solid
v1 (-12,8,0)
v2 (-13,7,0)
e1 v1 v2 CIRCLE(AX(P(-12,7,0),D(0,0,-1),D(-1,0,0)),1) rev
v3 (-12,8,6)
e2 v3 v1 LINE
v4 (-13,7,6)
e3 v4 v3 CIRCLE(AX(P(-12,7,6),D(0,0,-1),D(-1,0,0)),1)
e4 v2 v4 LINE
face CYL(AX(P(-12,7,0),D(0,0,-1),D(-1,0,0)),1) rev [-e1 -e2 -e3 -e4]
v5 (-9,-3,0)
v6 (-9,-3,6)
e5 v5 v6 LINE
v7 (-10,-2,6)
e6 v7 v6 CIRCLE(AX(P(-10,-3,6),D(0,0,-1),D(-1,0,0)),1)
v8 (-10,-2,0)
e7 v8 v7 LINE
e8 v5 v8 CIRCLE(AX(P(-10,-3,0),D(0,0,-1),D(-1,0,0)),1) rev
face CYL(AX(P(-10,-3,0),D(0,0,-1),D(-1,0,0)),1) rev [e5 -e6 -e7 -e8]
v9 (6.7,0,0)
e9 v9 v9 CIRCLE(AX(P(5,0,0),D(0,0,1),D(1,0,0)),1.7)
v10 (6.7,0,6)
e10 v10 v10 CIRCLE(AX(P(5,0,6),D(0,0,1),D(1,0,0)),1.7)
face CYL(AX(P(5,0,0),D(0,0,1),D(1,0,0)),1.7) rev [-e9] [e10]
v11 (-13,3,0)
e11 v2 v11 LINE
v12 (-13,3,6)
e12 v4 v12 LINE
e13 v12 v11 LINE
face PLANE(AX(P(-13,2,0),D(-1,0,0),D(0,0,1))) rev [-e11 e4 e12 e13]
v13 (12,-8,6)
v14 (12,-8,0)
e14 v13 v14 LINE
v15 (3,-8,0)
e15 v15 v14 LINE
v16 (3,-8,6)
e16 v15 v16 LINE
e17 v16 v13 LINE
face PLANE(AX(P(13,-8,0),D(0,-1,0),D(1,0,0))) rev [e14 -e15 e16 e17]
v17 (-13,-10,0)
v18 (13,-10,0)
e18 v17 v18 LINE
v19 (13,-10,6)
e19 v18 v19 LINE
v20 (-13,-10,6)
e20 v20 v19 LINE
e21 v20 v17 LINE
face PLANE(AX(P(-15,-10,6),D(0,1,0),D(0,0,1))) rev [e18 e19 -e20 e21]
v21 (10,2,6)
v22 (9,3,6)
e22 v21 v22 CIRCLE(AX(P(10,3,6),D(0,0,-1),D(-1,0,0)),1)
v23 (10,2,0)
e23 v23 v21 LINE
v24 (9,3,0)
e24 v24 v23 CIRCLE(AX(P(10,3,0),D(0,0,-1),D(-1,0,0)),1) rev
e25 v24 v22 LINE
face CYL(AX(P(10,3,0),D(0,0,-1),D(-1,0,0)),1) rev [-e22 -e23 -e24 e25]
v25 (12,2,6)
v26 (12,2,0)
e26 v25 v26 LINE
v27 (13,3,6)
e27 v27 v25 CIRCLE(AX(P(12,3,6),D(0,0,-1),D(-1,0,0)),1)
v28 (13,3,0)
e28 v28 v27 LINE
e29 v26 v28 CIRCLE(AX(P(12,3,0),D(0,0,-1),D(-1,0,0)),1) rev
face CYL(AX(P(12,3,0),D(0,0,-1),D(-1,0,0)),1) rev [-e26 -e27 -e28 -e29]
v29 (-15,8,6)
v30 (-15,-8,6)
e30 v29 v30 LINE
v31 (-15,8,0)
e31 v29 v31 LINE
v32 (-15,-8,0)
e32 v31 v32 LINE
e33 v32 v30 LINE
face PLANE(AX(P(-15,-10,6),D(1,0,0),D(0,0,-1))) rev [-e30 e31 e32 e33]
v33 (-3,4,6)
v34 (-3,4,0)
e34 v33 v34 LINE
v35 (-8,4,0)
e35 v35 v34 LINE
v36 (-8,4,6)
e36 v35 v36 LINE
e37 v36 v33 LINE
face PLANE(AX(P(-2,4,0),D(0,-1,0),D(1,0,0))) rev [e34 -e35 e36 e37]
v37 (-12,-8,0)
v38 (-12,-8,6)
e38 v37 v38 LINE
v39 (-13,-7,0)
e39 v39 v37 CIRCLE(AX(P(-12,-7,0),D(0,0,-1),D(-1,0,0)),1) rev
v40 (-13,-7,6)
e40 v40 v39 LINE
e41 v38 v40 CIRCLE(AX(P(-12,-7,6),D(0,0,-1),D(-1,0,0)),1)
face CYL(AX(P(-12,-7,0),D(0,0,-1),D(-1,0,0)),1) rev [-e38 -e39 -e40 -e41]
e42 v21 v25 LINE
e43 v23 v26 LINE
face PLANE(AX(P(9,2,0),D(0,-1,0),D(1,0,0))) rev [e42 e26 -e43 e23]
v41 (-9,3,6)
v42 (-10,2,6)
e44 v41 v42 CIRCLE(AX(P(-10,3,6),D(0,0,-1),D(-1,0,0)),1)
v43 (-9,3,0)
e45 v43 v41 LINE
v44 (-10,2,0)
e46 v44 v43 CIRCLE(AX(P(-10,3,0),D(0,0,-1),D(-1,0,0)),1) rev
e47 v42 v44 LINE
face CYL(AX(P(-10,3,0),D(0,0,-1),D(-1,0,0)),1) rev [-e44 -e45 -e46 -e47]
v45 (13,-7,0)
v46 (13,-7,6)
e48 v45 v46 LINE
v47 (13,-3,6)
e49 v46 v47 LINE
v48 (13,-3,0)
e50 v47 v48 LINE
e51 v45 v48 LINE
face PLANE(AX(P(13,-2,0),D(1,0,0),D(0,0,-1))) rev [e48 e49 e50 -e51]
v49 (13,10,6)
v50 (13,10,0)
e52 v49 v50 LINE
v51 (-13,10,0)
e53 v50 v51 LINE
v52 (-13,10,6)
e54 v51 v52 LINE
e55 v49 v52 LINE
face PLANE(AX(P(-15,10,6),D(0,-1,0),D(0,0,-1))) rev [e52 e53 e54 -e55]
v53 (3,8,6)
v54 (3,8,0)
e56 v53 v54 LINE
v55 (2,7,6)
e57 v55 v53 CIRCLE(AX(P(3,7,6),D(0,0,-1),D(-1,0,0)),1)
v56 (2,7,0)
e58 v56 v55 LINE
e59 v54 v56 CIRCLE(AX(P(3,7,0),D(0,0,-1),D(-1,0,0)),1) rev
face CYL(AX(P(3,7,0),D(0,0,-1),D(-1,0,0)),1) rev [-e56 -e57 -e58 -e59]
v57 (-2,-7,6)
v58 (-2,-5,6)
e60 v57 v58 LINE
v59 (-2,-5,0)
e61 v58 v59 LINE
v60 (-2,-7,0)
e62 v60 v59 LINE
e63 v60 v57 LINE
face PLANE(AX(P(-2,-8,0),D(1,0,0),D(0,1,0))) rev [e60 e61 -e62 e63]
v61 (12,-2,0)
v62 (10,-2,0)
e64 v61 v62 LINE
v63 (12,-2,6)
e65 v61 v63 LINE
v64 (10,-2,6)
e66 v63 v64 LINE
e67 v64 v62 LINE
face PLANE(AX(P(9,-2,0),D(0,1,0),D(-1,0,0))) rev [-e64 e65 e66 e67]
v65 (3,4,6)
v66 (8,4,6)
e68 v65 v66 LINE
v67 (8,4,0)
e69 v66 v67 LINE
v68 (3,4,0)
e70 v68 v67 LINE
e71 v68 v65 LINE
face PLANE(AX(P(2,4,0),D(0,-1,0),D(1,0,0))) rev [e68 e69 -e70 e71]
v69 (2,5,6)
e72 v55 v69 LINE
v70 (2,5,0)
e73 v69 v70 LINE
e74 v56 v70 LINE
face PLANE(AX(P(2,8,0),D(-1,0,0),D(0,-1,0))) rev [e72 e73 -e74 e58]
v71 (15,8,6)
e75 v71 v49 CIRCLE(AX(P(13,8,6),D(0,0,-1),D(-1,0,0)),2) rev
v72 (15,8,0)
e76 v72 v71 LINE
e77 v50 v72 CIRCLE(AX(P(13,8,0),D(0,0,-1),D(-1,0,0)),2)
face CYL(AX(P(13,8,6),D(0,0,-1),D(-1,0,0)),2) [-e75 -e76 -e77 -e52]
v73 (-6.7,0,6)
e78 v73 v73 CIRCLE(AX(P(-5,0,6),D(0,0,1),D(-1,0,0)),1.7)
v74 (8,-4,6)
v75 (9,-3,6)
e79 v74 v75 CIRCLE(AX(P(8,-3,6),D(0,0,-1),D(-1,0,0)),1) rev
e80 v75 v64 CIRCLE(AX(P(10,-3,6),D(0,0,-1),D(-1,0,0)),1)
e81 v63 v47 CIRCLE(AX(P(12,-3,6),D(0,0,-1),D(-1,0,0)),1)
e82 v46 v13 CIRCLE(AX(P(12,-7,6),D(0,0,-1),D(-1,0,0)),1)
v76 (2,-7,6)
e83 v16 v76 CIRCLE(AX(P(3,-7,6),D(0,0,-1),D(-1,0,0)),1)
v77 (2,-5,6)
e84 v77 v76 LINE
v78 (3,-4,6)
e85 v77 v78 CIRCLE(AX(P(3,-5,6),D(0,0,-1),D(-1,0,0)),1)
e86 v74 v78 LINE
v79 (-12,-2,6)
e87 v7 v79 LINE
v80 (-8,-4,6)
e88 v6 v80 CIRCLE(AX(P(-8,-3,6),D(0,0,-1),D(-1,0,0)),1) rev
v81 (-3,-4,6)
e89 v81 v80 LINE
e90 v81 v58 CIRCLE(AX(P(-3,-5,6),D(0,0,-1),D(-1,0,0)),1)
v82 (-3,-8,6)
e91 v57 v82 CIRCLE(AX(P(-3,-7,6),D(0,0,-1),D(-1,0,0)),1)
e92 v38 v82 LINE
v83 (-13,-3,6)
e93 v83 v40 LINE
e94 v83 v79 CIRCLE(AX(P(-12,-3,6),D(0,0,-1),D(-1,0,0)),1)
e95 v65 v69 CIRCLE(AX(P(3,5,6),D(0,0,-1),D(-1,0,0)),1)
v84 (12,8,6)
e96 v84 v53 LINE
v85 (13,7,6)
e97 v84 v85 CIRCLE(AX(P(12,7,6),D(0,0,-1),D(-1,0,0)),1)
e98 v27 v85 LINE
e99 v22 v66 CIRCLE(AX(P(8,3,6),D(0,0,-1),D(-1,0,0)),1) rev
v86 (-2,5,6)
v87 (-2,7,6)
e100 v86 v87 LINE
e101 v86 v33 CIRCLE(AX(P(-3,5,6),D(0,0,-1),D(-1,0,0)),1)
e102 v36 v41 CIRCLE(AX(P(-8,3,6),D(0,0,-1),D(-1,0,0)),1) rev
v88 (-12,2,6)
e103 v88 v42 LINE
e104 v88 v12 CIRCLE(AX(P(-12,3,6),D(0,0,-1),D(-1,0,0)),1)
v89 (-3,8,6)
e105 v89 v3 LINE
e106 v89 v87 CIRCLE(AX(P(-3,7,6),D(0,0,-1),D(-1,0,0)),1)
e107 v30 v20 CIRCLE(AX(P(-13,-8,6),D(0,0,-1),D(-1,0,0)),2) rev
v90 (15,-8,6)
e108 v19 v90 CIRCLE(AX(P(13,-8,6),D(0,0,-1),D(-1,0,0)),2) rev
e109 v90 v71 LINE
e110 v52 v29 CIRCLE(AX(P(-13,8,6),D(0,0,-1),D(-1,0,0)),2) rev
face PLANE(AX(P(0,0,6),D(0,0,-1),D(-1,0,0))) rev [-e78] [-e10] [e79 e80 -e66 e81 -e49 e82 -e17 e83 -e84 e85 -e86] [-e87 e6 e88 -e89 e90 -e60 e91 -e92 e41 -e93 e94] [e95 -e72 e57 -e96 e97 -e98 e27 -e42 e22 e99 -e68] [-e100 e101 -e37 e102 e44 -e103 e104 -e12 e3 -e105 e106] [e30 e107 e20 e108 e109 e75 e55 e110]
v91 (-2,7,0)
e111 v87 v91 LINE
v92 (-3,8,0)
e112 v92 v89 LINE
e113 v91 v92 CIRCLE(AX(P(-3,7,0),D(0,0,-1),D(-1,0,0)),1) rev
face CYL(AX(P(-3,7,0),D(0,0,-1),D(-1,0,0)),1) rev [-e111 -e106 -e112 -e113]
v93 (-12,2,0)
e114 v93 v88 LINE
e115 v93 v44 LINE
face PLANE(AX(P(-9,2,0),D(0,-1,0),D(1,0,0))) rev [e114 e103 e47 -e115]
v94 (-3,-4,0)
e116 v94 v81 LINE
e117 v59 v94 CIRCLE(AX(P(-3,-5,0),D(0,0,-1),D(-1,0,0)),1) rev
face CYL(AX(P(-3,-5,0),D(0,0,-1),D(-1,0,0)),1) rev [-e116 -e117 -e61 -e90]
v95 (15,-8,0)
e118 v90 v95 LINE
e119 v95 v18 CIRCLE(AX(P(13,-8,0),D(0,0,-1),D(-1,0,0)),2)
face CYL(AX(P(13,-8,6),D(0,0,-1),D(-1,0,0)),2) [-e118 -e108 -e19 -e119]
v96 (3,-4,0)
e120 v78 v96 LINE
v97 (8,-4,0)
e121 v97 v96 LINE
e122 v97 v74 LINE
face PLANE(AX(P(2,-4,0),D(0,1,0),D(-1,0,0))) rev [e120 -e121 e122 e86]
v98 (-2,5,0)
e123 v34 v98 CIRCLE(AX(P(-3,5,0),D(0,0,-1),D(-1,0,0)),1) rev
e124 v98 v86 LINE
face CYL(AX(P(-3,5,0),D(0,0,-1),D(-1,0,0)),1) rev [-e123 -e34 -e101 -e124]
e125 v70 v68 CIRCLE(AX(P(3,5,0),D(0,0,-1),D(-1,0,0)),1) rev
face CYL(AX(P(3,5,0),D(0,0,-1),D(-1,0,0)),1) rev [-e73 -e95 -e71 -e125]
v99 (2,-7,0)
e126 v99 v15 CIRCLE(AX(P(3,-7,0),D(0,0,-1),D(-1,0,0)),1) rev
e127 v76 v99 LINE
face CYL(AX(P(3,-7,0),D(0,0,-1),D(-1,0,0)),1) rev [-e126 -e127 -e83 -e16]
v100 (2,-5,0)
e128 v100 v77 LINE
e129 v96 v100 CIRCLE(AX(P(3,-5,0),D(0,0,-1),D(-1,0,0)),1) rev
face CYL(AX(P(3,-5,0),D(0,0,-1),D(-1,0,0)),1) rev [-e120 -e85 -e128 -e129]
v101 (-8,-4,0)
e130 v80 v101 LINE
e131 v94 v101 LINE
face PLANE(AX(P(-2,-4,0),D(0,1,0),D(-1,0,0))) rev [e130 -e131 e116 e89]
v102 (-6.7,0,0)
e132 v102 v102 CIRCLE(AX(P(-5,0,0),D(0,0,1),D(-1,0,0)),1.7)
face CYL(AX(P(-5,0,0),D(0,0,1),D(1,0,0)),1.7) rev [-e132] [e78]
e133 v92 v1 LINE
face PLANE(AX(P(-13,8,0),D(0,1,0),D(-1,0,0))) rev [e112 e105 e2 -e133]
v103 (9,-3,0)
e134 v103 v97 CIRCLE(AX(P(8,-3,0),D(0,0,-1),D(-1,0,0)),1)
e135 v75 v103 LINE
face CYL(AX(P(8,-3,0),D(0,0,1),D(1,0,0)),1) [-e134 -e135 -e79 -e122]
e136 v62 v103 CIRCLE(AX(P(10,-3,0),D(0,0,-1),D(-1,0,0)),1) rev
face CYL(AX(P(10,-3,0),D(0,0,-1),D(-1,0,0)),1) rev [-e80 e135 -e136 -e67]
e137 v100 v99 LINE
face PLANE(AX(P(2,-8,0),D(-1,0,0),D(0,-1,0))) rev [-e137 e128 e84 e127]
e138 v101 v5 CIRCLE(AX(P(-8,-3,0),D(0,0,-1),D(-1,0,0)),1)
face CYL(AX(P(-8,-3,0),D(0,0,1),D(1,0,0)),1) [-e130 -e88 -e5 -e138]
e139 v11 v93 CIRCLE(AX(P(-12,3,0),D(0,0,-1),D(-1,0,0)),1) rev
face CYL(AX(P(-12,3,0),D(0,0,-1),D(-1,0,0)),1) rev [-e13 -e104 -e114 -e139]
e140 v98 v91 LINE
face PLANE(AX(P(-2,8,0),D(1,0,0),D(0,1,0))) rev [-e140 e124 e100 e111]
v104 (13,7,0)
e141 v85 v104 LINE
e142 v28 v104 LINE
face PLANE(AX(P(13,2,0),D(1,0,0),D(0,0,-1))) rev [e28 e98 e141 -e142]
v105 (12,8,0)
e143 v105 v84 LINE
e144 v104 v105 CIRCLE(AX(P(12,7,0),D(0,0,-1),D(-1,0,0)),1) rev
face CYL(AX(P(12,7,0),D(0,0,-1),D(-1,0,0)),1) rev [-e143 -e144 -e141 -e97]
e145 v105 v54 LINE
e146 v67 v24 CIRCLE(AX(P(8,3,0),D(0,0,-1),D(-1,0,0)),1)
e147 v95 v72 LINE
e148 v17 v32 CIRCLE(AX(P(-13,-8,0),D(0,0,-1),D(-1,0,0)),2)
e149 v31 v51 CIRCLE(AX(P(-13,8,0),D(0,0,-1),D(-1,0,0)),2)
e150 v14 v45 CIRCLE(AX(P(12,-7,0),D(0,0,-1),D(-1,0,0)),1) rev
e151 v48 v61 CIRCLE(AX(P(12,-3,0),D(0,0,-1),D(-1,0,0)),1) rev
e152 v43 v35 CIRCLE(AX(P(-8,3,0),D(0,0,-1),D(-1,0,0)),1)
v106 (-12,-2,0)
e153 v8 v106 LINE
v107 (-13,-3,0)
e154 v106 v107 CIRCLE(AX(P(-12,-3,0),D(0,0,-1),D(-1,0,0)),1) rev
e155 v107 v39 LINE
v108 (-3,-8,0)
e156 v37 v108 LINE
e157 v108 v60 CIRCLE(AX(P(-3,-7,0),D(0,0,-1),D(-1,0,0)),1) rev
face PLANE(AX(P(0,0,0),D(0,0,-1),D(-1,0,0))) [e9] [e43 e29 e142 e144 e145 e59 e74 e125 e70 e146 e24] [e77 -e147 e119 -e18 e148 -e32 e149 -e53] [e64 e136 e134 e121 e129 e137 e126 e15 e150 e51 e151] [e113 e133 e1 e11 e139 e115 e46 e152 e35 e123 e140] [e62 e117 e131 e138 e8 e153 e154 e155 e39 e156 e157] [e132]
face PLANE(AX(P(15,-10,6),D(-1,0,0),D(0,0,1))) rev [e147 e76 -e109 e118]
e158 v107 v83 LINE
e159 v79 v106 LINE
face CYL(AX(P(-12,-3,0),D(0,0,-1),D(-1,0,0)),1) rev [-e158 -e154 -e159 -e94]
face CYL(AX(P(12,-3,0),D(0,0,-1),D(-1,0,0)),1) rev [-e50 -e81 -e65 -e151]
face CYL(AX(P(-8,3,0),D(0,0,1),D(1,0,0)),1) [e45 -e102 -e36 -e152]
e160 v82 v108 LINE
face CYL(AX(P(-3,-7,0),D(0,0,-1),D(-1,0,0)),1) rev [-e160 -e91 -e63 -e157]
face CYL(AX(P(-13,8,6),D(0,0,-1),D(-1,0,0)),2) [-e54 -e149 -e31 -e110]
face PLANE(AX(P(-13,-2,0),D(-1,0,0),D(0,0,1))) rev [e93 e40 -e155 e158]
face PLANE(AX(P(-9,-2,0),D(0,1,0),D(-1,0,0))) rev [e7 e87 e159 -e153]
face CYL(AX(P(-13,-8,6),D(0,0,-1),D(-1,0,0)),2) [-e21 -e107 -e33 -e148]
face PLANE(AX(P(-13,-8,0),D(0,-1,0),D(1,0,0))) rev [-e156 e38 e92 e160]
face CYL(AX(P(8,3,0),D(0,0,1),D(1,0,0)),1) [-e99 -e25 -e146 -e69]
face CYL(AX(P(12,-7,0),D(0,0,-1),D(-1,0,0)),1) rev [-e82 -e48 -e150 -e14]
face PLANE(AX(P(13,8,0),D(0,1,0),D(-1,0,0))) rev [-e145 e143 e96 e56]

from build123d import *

# Parameters (mm, degrees)
SKETCH_1_W          = 30
SKETCH_1_H          = 20
EXTRUDE_1_DEPTH     = 6
FILLET_1_R          = 2
SKETCH_2_R          = 1.7
CUT_EXTRUDE_1_DEPTH = 20
CUT_EXTRUDE_2_DEPTH = 20
FILLET_2_R          = 1


with BuildPart() as part:
    # 草图1 → 凸台-拉伸1 (new body)
    with BuildSketch(Plane.XY):
        Rectangle(SKETCH_1_W, SKETCH_1_H)
    extrude(amount=EXTRUDE_1_DEPTH)

    # 圆角1
    fillet_1_edges = [part.edges().sort_by_distance(p)[0] for p in [
        (15, -10, 3),
        (-15, -10, 3),
        (-15, 10, 3),
        (15, 10, 3),
    ]]
    fillet(fillet_1_edges, radius=FILLET_1_R)

    # 草图2 → 切除-拉伸1 (cut, through all)
    with BuildSketch(Plane.XY.offset(6)):
        with Locations((5, 0)):
            Circle(SKETCH_2_R)
        with Locations(Location((-5, 0, 0), (0, 0, 180))):
            Circle(SKETCH_2_R)
    extrude(amount=-CUT_EXTRUDE_1_DEPTH, mode=Mode.SUBTRACT)

    # 草图3 → 切除-拉伸2 (cut, through all)
    with BuildSketch(Plane.XY.offset(6)):
        Polygon((-13, 2), (-13, 8), (-2, 8), (-2, 4), (-9, 4), (-9, 2), align=None)
        Polygon((9, 2), (13, 2), (13, 8), (2, 8), (2, 4), (9, 4), align=None)
        Polygon((13, -2), (13, -8), (2, -8), (2, -4), (9, -4), (9, -2), align=None)
        Polygon((-9, -2), (-13, -2), (-13, -8), (-2, -8), (-2, -4), (-9, -4), align=None)
    extrude(amount=-CUT_EXTRUDE_2_DEPTH, mode=Mode.SUBTRACT)

    # 圆角2
    fillet_2_edges = [part.edges().sort_by_distance(p)[0] for p in [
        (-2, -4, 3),
        (2, 8, 3),
        (13, 8, 3),
        (13, 2, 3),
        (2, 4, 3),
        (9, 2, 3),
        (9, 4, 3),
        (13, -2, 3),
        (2, -8, 3),
        (2, -4, 3),
        (9, -2, 3),
        (9, -4, 3),
        (13, -8, 3),
        (-2, -8, 3),
        (-13, -8, 3),
        (-13, -2, 3),
        (-9, -2, 3),
        (-9, -4, 3),
        (-2, 8, 3),
        (-2, 4, 3),
        (-9, 4, 3),
        (-9, 2, 3),
        (-13, 2, 3),
        (-13, 8, 3),
    ]]
    fillet(fillet_2_edges, radius=FILLET_2_R - 0.0001)  # a hair under: the kernel refuses the full size


solid = part.part
